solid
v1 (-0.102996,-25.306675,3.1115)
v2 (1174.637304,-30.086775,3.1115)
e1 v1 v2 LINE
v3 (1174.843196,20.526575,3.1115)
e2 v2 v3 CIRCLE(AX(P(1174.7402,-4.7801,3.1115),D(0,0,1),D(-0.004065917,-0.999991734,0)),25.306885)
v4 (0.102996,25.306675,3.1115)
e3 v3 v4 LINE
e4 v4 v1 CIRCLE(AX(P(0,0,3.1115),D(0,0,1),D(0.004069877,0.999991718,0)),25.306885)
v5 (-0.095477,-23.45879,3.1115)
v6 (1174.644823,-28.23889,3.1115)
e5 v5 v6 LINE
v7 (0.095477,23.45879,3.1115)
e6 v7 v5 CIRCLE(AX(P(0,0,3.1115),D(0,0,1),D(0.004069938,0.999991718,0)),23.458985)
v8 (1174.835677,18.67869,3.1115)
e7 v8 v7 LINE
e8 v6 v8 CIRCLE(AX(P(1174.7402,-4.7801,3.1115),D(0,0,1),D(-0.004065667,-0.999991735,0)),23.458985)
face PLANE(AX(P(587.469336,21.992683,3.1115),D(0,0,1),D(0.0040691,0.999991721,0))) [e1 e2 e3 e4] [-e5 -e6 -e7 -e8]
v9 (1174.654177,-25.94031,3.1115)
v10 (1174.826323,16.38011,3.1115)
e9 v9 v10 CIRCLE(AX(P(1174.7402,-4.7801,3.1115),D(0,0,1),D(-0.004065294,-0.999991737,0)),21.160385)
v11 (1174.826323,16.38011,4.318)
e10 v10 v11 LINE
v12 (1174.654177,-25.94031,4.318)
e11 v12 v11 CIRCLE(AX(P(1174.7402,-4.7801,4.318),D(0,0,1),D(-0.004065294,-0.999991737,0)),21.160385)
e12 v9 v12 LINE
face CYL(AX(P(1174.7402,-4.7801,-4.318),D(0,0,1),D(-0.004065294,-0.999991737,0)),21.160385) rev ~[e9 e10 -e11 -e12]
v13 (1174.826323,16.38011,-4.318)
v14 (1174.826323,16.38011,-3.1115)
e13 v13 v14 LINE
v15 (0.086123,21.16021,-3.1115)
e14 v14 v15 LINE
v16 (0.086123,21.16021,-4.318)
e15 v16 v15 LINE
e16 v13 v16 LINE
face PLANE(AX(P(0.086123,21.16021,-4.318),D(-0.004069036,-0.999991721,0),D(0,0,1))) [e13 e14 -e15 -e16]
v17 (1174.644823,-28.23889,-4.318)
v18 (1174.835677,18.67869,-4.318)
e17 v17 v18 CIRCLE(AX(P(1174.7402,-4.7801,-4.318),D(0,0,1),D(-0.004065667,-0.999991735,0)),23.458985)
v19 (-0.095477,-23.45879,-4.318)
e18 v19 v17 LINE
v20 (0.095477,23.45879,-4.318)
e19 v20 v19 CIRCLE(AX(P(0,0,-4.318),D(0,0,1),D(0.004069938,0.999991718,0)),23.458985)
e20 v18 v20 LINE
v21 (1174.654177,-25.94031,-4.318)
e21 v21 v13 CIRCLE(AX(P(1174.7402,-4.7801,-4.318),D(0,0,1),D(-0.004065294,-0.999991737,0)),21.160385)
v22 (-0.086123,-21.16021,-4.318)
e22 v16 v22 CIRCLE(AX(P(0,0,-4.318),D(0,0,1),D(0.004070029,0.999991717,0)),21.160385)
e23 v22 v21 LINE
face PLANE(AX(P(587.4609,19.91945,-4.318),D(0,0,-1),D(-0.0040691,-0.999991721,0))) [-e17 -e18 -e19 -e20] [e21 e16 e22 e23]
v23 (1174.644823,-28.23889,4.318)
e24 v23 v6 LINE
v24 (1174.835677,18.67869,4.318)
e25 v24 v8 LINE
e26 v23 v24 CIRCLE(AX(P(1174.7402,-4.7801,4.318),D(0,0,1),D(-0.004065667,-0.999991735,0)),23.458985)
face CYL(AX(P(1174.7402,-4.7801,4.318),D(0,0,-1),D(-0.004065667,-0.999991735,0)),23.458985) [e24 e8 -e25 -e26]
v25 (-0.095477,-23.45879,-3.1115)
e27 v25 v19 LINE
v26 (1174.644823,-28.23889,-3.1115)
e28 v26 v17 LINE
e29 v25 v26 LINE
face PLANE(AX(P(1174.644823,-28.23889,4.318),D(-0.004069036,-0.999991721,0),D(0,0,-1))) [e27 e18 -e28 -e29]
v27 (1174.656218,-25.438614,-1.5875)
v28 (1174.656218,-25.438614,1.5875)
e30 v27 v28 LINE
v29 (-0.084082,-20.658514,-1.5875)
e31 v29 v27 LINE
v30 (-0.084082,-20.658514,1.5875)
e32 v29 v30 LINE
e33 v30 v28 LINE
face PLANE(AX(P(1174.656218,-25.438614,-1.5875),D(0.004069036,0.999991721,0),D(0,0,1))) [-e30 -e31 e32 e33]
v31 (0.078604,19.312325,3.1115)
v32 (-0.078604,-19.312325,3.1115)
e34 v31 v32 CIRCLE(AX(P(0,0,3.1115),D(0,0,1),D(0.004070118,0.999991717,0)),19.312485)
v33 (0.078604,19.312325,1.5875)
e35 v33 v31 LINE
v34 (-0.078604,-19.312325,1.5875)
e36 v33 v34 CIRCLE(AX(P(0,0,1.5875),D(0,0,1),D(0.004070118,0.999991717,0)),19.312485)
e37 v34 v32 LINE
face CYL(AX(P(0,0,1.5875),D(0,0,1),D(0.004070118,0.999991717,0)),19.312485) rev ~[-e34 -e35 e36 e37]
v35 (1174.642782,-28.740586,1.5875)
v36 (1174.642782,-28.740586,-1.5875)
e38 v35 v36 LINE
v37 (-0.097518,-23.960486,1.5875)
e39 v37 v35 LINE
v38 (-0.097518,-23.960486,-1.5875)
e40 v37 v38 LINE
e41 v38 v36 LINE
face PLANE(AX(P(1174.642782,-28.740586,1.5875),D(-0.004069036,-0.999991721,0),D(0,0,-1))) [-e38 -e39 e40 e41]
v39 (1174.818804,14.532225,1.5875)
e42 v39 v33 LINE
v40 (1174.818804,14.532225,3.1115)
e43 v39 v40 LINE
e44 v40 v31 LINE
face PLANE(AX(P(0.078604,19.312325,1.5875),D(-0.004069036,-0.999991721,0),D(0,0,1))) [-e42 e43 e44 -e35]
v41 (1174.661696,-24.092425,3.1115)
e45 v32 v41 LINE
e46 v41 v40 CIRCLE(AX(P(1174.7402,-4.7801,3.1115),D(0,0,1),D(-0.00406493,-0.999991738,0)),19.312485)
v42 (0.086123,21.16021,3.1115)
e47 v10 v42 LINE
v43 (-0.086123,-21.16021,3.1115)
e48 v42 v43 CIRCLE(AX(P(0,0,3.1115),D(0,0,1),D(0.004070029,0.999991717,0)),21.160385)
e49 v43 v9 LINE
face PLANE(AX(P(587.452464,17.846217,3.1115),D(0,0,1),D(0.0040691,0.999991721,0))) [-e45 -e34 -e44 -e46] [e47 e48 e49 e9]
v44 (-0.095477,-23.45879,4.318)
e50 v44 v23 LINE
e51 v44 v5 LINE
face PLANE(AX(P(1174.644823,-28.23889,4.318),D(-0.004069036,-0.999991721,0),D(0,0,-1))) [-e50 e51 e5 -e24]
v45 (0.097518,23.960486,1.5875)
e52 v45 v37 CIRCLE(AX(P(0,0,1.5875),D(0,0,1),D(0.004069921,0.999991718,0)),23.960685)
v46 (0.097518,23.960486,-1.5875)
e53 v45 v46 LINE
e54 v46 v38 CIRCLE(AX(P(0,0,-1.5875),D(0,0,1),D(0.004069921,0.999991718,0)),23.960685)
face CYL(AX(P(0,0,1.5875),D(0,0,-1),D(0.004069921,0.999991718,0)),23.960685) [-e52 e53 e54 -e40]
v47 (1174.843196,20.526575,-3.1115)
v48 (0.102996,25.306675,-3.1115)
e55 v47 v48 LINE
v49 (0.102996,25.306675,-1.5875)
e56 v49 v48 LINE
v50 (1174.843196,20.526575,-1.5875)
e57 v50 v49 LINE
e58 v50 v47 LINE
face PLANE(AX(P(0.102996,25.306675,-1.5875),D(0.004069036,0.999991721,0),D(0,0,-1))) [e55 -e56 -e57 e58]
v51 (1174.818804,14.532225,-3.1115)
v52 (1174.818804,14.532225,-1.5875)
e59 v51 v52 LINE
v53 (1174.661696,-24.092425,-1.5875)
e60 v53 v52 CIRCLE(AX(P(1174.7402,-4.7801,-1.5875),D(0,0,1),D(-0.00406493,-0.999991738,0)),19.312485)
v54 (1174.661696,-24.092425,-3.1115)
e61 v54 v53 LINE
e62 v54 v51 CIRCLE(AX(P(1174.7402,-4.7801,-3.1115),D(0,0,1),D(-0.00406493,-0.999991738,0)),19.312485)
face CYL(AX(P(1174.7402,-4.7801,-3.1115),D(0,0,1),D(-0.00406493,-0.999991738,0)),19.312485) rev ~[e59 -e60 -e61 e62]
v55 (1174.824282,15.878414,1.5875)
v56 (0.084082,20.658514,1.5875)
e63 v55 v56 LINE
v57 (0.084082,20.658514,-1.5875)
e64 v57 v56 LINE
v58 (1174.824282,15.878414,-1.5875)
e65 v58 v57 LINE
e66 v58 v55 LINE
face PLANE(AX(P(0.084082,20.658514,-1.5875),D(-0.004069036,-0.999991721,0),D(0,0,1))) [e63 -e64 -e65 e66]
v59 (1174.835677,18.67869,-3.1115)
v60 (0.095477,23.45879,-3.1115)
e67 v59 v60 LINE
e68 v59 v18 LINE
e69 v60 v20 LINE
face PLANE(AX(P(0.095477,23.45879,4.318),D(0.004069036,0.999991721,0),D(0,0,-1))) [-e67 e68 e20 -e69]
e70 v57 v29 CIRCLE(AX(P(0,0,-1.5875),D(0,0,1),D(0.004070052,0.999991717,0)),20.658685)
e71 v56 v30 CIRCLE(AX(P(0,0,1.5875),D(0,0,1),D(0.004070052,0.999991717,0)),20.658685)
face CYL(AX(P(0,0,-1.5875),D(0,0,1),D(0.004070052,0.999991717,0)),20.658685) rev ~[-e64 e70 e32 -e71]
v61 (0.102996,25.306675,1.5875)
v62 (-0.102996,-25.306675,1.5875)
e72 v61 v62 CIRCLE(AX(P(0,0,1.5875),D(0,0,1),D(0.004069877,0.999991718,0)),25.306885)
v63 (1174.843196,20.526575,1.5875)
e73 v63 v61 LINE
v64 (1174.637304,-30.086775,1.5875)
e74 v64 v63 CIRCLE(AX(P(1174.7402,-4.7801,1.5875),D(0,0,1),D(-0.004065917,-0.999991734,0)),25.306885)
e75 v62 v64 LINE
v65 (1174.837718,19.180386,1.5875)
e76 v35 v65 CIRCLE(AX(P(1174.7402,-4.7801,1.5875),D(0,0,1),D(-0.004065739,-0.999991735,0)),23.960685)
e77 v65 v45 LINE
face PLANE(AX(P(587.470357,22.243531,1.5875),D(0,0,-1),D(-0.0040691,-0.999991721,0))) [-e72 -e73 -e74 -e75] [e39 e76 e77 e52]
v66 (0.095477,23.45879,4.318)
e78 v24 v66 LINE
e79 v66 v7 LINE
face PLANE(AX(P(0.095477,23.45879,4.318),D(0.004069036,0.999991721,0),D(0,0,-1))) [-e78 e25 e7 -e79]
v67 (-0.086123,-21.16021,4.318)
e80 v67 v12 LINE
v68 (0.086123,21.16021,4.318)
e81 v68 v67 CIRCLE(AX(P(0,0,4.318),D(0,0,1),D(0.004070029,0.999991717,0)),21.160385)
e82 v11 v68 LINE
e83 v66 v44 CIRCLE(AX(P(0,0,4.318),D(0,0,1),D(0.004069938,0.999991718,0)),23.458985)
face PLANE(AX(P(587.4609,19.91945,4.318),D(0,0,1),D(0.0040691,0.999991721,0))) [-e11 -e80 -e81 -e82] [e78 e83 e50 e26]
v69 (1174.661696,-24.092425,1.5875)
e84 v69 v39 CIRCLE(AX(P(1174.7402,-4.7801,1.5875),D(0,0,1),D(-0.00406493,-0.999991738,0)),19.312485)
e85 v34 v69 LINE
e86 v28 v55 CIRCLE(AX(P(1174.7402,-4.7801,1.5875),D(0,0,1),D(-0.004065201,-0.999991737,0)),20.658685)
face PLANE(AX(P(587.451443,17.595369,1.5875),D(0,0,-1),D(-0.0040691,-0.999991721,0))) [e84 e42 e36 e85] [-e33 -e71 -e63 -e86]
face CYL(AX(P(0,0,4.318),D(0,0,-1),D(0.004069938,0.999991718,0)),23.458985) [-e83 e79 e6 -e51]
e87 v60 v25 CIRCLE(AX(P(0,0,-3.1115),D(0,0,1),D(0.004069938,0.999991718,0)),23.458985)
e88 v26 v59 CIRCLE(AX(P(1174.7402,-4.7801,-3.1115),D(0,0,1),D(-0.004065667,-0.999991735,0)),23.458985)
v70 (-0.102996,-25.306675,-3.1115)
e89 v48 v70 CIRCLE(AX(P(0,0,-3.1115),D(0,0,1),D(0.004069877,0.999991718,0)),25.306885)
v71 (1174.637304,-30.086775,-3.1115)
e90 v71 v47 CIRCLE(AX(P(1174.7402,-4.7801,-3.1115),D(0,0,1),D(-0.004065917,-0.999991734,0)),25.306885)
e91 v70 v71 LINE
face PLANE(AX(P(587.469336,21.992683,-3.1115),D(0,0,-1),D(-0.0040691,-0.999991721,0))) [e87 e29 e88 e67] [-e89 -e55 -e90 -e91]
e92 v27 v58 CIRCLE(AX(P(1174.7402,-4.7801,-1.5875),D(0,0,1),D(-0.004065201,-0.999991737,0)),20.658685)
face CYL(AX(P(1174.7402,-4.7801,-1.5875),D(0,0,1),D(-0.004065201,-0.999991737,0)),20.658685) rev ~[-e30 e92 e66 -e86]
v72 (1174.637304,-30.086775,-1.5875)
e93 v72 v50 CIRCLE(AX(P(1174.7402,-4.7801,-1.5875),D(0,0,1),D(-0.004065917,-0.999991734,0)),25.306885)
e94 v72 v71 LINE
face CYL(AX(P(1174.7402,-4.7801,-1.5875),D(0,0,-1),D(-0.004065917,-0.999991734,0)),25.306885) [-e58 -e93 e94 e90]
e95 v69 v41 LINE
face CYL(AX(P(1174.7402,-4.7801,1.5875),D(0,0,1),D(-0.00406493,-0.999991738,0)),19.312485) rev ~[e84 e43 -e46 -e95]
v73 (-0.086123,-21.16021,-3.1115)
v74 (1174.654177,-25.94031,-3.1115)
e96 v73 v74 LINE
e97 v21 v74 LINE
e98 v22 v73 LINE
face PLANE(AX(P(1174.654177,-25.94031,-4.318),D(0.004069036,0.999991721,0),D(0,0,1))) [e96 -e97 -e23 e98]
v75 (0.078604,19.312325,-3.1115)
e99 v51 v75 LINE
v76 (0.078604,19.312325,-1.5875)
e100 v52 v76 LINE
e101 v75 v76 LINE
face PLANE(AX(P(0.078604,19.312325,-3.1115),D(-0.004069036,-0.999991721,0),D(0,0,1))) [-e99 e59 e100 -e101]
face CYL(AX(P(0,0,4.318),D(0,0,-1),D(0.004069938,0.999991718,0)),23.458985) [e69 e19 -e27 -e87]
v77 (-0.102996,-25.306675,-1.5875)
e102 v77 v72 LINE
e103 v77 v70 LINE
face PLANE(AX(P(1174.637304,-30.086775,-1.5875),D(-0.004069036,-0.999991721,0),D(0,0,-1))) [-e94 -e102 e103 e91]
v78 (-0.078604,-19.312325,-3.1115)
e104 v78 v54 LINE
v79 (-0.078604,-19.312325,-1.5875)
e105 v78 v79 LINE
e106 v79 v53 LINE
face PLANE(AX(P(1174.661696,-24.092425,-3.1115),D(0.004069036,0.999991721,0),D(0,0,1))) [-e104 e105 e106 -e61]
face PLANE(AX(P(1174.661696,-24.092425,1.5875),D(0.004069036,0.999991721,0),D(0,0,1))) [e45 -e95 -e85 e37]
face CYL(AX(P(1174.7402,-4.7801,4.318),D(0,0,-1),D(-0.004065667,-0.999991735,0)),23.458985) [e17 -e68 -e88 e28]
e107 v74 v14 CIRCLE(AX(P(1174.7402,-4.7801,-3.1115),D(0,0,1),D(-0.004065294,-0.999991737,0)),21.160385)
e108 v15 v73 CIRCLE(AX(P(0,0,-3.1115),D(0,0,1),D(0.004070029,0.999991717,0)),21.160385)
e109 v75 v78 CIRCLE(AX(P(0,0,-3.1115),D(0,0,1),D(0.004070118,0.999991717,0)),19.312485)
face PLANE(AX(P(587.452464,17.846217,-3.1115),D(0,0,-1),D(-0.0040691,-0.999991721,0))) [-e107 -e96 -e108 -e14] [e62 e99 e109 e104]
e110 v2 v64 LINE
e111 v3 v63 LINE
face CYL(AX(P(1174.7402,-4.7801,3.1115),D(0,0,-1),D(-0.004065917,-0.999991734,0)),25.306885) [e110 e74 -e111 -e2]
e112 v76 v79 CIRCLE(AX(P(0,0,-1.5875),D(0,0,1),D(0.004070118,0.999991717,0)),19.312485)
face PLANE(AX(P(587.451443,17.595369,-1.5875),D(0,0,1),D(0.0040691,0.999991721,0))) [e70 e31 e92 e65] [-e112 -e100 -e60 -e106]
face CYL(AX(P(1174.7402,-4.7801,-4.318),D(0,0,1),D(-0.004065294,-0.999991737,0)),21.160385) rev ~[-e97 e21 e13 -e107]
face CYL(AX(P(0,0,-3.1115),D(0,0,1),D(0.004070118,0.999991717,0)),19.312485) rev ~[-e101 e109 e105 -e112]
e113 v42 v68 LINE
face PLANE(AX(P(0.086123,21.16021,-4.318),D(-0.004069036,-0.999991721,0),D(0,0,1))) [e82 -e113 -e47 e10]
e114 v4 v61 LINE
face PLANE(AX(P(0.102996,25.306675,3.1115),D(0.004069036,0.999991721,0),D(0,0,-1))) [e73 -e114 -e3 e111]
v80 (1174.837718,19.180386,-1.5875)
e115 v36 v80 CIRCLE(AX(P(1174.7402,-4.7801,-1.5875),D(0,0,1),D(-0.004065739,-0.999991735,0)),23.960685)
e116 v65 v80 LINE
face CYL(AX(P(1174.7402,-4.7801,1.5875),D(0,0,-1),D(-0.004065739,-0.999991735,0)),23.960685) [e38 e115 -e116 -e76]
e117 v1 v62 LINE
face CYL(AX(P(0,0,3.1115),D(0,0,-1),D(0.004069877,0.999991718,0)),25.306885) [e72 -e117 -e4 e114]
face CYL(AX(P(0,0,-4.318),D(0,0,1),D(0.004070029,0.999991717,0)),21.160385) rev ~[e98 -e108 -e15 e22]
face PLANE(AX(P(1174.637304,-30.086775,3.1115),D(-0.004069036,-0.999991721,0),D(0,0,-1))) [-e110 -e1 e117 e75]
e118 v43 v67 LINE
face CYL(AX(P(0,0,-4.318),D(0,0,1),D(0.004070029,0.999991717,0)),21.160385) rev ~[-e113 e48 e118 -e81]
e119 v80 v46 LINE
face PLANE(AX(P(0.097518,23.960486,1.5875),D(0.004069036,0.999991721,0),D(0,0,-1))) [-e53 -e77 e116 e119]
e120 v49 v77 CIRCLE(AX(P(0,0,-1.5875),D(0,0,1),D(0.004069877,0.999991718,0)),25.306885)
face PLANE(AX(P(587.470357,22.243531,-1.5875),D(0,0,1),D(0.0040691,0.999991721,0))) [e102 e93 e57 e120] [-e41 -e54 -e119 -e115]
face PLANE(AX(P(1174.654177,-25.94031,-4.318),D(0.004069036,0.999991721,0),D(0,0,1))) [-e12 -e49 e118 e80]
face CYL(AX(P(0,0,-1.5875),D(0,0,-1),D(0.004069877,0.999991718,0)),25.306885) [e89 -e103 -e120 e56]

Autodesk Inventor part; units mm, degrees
ref_plane "Work Plane2" through (0, 0, 0) normal (-1, 0, 0) x (0, 0, 1)
ref_plane "Work Plane3" through (1174.7402, -4.7801, 0) normal (-0.959493, 0.2817326, 0) x (0, 0, 1)
sketch "Path" plane through (0, 0, 0) normal (0, 0, 1) x (1, 0, 0)
  arc A0 (0.0908, 22.3095) -> (-0.0908, -22.3095) centre (0, 0) ccw
  arc A1 (1174.6495, -27.0896) -> (1174.831, 17.5294) centre (1174.7402, -4.7801) ccw
  line L0 (1174.6495, -27.0896) -> (-0.0908, -22.3095)
  line L1 (0.0908, 22.3095) -> (1174.831, 17.5294)
  dimension "d31" = 5.9944
ref_plane "Section Plane" through (-0.0908, -22.3095, 0) normal (0.9999917, -0.0040691, 0) x (0, 0, 1)
sketch "Section Sketch" plane through (-0.0908, -22.3095, 0) normal (0.9999917, -0.0040691, 0) x (0, 0, 1)
  line L0 (-4.318, -1.1493) -> (4.318, -1.1493)
  line L1 (4.318, -1.1493) -> (4.318, 1.1493)
  line L2 (4.318, 1.1493) -> (-4.318, 1.1493)
  line L3 (-4.318, 1.1493) -> (-4.318, -1.1493)
  line L4 (-1.5875, -1.651) -> (1.5875, -1.651)
  line L5 (1.5875, -1.651) -> (1.5875, 1.651)
  line L6 (1.5875, 1.651) -> (-1.5875, 1.651)
  line L7 (-1.5875, 1.651) -> (-1.5875, -1.651)
  line L8 (-1.5875, 0) -> (1.5875, 0) construction
  line L9 (-3.1115, -2.9972) -> (-1.5875, -2.9972)
  line L10 (-1.5875, -2.9972) -> (-1.5875, 2.9972)
  line L11 (-1.5875, 2.9972) -> (-3.1115, 2.9972)
  line L12 (-3.1115, 2.9972) -> (-3.1115, -2.9972)
  line L13 (1.5875, -2.9972) -> (3.1115, -2.9972)
  line L14 (3.1115, -2.9972) -> (3.1115, 2.9972)
  line L15 (3.1115, 2.9972) -> (1.5875, 2.9972)
  line L16 (1.5875, 2.9972) -> (1.5875, -2.9972)
  line L17 (-4.318, 0) -> (4.318, 0) construction
  point P0 (0, 0)
  point P1 (0, 0)
  dimension "d21" = 2.2987
  dimension "d22" = 3.302
  dimension "d23" = 3.175
  dimension "d24" = 1.524
  dimension "d31" = 5.9944
  dimension "d32" = 8.636
sweep "Solid" add profiles "Section Sketch" path "Path"
pattern_of_one "Strand Pattern"
equation "\"d21\" = da_d2"
equation "\"d22\" = da_d1"
equation "\"d23\" = da_b1"
equation "\"d24\" = da_t1 + da_t2"
equation "\"d30\" = da_pt"
equation "\"da_p\" = 6.35"
equation "\"da_b1\" = 3.175"
equation "\"da_h2\" = 5.9944"
equation "\"da_h3\" = 5.207"
equation "\"da_d1\" = 3.302"
equation "\"da_d2\" = 2.2987"
equation "\"da_pt\" = 6.4008"
equation "\"da_b\" = 8.636"
equation "\"da_t1\" = 0.762"
equation "\"da_t2\" = 0.762"
properties part number "Roller Chain"
